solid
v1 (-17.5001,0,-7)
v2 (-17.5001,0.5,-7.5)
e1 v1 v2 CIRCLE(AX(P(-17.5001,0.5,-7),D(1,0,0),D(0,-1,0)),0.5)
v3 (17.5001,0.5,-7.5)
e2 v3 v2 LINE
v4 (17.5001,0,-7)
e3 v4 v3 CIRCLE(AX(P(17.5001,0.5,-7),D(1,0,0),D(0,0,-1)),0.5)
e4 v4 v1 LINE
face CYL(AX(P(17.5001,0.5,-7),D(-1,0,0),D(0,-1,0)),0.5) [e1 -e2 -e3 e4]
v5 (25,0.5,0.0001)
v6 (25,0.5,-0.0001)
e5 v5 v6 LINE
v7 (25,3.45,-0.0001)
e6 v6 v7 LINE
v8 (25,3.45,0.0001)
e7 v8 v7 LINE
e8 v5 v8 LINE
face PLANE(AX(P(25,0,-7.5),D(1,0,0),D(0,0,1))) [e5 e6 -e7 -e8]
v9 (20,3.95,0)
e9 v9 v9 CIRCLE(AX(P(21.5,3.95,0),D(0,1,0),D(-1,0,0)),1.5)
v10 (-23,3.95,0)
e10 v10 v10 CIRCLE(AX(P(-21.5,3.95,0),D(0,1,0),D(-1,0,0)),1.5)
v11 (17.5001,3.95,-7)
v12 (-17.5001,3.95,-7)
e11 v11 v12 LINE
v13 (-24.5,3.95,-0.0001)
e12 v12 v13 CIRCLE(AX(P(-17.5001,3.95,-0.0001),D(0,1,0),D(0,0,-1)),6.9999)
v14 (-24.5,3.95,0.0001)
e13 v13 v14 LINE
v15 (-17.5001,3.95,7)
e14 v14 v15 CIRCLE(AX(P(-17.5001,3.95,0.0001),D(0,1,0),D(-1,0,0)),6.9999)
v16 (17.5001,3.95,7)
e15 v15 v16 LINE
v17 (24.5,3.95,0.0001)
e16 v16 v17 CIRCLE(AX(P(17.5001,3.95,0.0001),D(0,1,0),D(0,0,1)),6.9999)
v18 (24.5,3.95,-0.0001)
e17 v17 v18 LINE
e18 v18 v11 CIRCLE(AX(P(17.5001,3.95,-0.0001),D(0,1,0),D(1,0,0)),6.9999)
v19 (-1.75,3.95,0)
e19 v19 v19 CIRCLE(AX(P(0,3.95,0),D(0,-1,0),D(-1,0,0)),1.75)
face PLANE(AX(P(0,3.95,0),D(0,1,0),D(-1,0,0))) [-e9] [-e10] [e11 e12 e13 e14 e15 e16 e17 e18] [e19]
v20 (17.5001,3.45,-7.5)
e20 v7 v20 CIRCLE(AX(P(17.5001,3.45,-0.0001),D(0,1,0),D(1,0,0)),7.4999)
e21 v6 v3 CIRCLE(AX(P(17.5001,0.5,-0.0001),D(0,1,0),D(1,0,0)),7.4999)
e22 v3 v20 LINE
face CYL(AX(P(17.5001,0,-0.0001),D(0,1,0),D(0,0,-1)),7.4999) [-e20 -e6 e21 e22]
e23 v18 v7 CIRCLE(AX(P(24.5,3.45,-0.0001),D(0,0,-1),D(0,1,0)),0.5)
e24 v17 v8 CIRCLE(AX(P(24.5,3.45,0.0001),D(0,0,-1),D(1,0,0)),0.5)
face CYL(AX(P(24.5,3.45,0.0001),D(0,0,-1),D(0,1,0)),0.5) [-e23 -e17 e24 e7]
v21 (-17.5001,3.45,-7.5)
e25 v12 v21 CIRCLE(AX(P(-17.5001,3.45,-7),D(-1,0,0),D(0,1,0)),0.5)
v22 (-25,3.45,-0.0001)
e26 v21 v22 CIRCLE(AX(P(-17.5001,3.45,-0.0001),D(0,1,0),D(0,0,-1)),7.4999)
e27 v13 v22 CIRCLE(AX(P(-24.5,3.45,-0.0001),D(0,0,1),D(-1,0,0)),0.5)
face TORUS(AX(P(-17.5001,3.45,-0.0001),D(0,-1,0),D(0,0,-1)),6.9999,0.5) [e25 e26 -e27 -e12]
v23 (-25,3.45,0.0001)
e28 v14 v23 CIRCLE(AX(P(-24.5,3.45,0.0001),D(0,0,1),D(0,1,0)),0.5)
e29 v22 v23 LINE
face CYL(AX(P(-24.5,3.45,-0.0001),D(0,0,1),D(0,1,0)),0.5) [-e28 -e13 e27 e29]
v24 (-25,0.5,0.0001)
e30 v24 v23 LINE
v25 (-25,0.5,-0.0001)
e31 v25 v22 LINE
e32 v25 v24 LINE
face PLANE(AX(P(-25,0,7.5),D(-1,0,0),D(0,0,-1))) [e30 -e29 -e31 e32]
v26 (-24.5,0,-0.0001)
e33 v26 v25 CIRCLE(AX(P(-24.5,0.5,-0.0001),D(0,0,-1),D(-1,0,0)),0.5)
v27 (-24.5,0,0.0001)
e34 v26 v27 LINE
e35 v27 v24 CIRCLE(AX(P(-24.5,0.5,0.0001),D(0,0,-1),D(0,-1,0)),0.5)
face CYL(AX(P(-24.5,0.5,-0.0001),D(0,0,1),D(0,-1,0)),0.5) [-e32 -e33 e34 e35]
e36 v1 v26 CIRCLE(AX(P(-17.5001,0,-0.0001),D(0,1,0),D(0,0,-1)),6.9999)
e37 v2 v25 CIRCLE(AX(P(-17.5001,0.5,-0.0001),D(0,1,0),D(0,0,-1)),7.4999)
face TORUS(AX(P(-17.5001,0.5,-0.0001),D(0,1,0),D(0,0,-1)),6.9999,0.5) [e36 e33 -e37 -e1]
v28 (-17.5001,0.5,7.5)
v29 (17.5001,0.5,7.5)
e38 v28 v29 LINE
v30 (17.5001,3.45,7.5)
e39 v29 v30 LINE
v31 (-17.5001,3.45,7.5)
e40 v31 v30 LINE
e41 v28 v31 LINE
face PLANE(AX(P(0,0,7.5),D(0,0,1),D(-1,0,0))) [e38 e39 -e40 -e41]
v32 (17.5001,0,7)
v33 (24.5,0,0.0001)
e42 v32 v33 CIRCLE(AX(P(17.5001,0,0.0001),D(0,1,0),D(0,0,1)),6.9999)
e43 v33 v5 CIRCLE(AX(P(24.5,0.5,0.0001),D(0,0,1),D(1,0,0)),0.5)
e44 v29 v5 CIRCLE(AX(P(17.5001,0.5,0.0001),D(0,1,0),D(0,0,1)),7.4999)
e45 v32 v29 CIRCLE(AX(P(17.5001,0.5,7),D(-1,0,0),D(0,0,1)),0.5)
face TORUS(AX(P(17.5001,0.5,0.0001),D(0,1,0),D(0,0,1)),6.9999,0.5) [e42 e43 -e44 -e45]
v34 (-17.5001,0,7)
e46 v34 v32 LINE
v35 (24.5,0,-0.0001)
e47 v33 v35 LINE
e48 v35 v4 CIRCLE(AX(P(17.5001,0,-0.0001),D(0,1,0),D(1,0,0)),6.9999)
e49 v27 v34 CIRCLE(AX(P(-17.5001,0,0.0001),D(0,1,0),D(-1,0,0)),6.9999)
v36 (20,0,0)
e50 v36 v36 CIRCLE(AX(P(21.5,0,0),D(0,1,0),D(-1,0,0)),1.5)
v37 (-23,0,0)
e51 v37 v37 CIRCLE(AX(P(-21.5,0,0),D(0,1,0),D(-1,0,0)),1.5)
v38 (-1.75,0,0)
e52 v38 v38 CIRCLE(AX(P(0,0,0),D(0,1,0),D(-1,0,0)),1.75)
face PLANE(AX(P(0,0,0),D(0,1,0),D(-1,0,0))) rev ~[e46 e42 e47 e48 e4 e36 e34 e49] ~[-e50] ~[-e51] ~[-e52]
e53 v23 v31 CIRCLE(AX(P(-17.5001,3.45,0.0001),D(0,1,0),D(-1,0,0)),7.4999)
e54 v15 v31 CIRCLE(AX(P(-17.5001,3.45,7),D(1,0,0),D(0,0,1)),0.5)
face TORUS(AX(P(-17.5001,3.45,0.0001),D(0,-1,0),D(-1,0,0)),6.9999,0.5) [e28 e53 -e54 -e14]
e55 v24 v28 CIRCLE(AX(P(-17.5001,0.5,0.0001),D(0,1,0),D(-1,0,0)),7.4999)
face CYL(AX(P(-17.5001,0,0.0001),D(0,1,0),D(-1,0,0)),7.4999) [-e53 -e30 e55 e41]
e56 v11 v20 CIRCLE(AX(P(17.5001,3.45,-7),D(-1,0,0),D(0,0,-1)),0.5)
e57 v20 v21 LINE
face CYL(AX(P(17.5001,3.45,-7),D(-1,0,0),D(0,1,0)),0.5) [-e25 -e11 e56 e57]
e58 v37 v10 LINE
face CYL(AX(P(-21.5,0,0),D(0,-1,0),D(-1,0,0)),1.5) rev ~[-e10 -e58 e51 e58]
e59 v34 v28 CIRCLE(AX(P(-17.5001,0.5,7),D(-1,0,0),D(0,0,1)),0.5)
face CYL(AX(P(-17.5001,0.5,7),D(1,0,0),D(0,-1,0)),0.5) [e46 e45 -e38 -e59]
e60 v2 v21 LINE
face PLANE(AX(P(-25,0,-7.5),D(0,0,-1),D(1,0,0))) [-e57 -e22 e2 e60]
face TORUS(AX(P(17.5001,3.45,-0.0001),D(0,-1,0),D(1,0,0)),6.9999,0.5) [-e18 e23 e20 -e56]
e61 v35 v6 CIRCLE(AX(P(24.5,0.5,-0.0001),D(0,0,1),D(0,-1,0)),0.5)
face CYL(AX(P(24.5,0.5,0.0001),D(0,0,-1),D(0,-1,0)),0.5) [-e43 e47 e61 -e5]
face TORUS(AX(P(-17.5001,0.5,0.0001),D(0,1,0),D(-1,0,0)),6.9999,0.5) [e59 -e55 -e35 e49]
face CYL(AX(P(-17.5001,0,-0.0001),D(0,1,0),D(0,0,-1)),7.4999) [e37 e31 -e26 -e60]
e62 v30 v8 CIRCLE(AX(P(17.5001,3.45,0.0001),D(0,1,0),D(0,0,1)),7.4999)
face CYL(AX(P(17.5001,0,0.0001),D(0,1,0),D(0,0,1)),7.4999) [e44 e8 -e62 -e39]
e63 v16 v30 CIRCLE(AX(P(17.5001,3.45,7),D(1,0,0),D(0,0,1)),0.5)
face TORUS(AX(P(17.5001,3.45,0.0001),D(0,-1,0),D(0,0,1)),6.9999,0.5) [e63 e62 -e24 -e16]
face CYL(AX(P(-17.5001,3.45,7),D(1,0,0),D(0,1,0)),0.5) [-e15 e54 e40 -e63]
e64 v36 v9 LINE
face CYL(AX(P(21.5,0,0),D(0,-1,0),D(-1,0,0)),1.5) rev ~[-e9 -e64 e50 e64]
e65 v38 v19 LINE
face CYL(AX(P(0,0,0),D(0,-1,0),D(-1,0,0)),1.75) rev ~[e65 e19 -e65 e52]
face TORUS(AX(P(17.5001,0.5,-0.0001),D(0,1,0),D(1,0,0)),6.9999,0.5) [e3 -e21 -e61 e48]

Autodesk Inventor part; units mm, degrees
ref_plane "YZ Plane" through (0, 0, 0) normal (1, 0, 0) x (0, 1, 0)
ref_plane "XZ Plane" through (0, 0, 0) normal (0, 1, 0) x (-1, 0, 0)
ref_plane "XY Plane" through (0, 0, 0) normal (0, 0, 1) x (1, 0, 0)
sketch "Sketch1" plane through (0, 0, 0) normal (0, 1, 0) x (-1, 0, 0)
  line L0 (25, -7.5) -> (-25, -7.5)
  line L1 (-25, -7.5) -> (-25, 7.5)
  line L2 (-25, 7.5) -> (25, 7.5)
  line L3 (25, 7.5) -> (25, -7.5)
  circle A0 centre (0, 0) radius 1.75
  circle A1 centre (-21.5, 0) radius 1.5
  line L4 (0, 11.4467) -> (0, -17.1004)
  circle A2 centre (21.5, 0) radius 1.5
  point P0 (0, -7.5)
  dimension "d0" = 15
  dimension "d1" = 50
  dimension "d2" = 25
  dimension "d3" = 3.5
  dimension "d4" = 7.5
  dimension "d7" = 3
  dimension "d9" = 7.5
  dimension "d10" = 2
extrude "Extrusion2" add sketch "Sketch1" along normal blind 3.95 contours L0 L4 A0 L2 L3 | L0 L1 L2 L4 A0
fillet "Fillet1" radius 7.5 4 edges at (25, 1.975, 7.5) (25, 1.975, -7.5) (-25, 1.975, 7.5) (-25, 1.975, -7.5)
fillet "Fillet2" radius 0.5 8 edges at (22.8033, 3.95, 5.3033) (0, 3.95, -7.5) (-22.8033, 3.95, 5.3033) (0, 3.95, 7.5) (22.8033, 0, 5.3033) (0, 0, -7.5) (-22.8033, 0, 5.3033) (0, 0, 7.5)
properties part number "PropConnector"
